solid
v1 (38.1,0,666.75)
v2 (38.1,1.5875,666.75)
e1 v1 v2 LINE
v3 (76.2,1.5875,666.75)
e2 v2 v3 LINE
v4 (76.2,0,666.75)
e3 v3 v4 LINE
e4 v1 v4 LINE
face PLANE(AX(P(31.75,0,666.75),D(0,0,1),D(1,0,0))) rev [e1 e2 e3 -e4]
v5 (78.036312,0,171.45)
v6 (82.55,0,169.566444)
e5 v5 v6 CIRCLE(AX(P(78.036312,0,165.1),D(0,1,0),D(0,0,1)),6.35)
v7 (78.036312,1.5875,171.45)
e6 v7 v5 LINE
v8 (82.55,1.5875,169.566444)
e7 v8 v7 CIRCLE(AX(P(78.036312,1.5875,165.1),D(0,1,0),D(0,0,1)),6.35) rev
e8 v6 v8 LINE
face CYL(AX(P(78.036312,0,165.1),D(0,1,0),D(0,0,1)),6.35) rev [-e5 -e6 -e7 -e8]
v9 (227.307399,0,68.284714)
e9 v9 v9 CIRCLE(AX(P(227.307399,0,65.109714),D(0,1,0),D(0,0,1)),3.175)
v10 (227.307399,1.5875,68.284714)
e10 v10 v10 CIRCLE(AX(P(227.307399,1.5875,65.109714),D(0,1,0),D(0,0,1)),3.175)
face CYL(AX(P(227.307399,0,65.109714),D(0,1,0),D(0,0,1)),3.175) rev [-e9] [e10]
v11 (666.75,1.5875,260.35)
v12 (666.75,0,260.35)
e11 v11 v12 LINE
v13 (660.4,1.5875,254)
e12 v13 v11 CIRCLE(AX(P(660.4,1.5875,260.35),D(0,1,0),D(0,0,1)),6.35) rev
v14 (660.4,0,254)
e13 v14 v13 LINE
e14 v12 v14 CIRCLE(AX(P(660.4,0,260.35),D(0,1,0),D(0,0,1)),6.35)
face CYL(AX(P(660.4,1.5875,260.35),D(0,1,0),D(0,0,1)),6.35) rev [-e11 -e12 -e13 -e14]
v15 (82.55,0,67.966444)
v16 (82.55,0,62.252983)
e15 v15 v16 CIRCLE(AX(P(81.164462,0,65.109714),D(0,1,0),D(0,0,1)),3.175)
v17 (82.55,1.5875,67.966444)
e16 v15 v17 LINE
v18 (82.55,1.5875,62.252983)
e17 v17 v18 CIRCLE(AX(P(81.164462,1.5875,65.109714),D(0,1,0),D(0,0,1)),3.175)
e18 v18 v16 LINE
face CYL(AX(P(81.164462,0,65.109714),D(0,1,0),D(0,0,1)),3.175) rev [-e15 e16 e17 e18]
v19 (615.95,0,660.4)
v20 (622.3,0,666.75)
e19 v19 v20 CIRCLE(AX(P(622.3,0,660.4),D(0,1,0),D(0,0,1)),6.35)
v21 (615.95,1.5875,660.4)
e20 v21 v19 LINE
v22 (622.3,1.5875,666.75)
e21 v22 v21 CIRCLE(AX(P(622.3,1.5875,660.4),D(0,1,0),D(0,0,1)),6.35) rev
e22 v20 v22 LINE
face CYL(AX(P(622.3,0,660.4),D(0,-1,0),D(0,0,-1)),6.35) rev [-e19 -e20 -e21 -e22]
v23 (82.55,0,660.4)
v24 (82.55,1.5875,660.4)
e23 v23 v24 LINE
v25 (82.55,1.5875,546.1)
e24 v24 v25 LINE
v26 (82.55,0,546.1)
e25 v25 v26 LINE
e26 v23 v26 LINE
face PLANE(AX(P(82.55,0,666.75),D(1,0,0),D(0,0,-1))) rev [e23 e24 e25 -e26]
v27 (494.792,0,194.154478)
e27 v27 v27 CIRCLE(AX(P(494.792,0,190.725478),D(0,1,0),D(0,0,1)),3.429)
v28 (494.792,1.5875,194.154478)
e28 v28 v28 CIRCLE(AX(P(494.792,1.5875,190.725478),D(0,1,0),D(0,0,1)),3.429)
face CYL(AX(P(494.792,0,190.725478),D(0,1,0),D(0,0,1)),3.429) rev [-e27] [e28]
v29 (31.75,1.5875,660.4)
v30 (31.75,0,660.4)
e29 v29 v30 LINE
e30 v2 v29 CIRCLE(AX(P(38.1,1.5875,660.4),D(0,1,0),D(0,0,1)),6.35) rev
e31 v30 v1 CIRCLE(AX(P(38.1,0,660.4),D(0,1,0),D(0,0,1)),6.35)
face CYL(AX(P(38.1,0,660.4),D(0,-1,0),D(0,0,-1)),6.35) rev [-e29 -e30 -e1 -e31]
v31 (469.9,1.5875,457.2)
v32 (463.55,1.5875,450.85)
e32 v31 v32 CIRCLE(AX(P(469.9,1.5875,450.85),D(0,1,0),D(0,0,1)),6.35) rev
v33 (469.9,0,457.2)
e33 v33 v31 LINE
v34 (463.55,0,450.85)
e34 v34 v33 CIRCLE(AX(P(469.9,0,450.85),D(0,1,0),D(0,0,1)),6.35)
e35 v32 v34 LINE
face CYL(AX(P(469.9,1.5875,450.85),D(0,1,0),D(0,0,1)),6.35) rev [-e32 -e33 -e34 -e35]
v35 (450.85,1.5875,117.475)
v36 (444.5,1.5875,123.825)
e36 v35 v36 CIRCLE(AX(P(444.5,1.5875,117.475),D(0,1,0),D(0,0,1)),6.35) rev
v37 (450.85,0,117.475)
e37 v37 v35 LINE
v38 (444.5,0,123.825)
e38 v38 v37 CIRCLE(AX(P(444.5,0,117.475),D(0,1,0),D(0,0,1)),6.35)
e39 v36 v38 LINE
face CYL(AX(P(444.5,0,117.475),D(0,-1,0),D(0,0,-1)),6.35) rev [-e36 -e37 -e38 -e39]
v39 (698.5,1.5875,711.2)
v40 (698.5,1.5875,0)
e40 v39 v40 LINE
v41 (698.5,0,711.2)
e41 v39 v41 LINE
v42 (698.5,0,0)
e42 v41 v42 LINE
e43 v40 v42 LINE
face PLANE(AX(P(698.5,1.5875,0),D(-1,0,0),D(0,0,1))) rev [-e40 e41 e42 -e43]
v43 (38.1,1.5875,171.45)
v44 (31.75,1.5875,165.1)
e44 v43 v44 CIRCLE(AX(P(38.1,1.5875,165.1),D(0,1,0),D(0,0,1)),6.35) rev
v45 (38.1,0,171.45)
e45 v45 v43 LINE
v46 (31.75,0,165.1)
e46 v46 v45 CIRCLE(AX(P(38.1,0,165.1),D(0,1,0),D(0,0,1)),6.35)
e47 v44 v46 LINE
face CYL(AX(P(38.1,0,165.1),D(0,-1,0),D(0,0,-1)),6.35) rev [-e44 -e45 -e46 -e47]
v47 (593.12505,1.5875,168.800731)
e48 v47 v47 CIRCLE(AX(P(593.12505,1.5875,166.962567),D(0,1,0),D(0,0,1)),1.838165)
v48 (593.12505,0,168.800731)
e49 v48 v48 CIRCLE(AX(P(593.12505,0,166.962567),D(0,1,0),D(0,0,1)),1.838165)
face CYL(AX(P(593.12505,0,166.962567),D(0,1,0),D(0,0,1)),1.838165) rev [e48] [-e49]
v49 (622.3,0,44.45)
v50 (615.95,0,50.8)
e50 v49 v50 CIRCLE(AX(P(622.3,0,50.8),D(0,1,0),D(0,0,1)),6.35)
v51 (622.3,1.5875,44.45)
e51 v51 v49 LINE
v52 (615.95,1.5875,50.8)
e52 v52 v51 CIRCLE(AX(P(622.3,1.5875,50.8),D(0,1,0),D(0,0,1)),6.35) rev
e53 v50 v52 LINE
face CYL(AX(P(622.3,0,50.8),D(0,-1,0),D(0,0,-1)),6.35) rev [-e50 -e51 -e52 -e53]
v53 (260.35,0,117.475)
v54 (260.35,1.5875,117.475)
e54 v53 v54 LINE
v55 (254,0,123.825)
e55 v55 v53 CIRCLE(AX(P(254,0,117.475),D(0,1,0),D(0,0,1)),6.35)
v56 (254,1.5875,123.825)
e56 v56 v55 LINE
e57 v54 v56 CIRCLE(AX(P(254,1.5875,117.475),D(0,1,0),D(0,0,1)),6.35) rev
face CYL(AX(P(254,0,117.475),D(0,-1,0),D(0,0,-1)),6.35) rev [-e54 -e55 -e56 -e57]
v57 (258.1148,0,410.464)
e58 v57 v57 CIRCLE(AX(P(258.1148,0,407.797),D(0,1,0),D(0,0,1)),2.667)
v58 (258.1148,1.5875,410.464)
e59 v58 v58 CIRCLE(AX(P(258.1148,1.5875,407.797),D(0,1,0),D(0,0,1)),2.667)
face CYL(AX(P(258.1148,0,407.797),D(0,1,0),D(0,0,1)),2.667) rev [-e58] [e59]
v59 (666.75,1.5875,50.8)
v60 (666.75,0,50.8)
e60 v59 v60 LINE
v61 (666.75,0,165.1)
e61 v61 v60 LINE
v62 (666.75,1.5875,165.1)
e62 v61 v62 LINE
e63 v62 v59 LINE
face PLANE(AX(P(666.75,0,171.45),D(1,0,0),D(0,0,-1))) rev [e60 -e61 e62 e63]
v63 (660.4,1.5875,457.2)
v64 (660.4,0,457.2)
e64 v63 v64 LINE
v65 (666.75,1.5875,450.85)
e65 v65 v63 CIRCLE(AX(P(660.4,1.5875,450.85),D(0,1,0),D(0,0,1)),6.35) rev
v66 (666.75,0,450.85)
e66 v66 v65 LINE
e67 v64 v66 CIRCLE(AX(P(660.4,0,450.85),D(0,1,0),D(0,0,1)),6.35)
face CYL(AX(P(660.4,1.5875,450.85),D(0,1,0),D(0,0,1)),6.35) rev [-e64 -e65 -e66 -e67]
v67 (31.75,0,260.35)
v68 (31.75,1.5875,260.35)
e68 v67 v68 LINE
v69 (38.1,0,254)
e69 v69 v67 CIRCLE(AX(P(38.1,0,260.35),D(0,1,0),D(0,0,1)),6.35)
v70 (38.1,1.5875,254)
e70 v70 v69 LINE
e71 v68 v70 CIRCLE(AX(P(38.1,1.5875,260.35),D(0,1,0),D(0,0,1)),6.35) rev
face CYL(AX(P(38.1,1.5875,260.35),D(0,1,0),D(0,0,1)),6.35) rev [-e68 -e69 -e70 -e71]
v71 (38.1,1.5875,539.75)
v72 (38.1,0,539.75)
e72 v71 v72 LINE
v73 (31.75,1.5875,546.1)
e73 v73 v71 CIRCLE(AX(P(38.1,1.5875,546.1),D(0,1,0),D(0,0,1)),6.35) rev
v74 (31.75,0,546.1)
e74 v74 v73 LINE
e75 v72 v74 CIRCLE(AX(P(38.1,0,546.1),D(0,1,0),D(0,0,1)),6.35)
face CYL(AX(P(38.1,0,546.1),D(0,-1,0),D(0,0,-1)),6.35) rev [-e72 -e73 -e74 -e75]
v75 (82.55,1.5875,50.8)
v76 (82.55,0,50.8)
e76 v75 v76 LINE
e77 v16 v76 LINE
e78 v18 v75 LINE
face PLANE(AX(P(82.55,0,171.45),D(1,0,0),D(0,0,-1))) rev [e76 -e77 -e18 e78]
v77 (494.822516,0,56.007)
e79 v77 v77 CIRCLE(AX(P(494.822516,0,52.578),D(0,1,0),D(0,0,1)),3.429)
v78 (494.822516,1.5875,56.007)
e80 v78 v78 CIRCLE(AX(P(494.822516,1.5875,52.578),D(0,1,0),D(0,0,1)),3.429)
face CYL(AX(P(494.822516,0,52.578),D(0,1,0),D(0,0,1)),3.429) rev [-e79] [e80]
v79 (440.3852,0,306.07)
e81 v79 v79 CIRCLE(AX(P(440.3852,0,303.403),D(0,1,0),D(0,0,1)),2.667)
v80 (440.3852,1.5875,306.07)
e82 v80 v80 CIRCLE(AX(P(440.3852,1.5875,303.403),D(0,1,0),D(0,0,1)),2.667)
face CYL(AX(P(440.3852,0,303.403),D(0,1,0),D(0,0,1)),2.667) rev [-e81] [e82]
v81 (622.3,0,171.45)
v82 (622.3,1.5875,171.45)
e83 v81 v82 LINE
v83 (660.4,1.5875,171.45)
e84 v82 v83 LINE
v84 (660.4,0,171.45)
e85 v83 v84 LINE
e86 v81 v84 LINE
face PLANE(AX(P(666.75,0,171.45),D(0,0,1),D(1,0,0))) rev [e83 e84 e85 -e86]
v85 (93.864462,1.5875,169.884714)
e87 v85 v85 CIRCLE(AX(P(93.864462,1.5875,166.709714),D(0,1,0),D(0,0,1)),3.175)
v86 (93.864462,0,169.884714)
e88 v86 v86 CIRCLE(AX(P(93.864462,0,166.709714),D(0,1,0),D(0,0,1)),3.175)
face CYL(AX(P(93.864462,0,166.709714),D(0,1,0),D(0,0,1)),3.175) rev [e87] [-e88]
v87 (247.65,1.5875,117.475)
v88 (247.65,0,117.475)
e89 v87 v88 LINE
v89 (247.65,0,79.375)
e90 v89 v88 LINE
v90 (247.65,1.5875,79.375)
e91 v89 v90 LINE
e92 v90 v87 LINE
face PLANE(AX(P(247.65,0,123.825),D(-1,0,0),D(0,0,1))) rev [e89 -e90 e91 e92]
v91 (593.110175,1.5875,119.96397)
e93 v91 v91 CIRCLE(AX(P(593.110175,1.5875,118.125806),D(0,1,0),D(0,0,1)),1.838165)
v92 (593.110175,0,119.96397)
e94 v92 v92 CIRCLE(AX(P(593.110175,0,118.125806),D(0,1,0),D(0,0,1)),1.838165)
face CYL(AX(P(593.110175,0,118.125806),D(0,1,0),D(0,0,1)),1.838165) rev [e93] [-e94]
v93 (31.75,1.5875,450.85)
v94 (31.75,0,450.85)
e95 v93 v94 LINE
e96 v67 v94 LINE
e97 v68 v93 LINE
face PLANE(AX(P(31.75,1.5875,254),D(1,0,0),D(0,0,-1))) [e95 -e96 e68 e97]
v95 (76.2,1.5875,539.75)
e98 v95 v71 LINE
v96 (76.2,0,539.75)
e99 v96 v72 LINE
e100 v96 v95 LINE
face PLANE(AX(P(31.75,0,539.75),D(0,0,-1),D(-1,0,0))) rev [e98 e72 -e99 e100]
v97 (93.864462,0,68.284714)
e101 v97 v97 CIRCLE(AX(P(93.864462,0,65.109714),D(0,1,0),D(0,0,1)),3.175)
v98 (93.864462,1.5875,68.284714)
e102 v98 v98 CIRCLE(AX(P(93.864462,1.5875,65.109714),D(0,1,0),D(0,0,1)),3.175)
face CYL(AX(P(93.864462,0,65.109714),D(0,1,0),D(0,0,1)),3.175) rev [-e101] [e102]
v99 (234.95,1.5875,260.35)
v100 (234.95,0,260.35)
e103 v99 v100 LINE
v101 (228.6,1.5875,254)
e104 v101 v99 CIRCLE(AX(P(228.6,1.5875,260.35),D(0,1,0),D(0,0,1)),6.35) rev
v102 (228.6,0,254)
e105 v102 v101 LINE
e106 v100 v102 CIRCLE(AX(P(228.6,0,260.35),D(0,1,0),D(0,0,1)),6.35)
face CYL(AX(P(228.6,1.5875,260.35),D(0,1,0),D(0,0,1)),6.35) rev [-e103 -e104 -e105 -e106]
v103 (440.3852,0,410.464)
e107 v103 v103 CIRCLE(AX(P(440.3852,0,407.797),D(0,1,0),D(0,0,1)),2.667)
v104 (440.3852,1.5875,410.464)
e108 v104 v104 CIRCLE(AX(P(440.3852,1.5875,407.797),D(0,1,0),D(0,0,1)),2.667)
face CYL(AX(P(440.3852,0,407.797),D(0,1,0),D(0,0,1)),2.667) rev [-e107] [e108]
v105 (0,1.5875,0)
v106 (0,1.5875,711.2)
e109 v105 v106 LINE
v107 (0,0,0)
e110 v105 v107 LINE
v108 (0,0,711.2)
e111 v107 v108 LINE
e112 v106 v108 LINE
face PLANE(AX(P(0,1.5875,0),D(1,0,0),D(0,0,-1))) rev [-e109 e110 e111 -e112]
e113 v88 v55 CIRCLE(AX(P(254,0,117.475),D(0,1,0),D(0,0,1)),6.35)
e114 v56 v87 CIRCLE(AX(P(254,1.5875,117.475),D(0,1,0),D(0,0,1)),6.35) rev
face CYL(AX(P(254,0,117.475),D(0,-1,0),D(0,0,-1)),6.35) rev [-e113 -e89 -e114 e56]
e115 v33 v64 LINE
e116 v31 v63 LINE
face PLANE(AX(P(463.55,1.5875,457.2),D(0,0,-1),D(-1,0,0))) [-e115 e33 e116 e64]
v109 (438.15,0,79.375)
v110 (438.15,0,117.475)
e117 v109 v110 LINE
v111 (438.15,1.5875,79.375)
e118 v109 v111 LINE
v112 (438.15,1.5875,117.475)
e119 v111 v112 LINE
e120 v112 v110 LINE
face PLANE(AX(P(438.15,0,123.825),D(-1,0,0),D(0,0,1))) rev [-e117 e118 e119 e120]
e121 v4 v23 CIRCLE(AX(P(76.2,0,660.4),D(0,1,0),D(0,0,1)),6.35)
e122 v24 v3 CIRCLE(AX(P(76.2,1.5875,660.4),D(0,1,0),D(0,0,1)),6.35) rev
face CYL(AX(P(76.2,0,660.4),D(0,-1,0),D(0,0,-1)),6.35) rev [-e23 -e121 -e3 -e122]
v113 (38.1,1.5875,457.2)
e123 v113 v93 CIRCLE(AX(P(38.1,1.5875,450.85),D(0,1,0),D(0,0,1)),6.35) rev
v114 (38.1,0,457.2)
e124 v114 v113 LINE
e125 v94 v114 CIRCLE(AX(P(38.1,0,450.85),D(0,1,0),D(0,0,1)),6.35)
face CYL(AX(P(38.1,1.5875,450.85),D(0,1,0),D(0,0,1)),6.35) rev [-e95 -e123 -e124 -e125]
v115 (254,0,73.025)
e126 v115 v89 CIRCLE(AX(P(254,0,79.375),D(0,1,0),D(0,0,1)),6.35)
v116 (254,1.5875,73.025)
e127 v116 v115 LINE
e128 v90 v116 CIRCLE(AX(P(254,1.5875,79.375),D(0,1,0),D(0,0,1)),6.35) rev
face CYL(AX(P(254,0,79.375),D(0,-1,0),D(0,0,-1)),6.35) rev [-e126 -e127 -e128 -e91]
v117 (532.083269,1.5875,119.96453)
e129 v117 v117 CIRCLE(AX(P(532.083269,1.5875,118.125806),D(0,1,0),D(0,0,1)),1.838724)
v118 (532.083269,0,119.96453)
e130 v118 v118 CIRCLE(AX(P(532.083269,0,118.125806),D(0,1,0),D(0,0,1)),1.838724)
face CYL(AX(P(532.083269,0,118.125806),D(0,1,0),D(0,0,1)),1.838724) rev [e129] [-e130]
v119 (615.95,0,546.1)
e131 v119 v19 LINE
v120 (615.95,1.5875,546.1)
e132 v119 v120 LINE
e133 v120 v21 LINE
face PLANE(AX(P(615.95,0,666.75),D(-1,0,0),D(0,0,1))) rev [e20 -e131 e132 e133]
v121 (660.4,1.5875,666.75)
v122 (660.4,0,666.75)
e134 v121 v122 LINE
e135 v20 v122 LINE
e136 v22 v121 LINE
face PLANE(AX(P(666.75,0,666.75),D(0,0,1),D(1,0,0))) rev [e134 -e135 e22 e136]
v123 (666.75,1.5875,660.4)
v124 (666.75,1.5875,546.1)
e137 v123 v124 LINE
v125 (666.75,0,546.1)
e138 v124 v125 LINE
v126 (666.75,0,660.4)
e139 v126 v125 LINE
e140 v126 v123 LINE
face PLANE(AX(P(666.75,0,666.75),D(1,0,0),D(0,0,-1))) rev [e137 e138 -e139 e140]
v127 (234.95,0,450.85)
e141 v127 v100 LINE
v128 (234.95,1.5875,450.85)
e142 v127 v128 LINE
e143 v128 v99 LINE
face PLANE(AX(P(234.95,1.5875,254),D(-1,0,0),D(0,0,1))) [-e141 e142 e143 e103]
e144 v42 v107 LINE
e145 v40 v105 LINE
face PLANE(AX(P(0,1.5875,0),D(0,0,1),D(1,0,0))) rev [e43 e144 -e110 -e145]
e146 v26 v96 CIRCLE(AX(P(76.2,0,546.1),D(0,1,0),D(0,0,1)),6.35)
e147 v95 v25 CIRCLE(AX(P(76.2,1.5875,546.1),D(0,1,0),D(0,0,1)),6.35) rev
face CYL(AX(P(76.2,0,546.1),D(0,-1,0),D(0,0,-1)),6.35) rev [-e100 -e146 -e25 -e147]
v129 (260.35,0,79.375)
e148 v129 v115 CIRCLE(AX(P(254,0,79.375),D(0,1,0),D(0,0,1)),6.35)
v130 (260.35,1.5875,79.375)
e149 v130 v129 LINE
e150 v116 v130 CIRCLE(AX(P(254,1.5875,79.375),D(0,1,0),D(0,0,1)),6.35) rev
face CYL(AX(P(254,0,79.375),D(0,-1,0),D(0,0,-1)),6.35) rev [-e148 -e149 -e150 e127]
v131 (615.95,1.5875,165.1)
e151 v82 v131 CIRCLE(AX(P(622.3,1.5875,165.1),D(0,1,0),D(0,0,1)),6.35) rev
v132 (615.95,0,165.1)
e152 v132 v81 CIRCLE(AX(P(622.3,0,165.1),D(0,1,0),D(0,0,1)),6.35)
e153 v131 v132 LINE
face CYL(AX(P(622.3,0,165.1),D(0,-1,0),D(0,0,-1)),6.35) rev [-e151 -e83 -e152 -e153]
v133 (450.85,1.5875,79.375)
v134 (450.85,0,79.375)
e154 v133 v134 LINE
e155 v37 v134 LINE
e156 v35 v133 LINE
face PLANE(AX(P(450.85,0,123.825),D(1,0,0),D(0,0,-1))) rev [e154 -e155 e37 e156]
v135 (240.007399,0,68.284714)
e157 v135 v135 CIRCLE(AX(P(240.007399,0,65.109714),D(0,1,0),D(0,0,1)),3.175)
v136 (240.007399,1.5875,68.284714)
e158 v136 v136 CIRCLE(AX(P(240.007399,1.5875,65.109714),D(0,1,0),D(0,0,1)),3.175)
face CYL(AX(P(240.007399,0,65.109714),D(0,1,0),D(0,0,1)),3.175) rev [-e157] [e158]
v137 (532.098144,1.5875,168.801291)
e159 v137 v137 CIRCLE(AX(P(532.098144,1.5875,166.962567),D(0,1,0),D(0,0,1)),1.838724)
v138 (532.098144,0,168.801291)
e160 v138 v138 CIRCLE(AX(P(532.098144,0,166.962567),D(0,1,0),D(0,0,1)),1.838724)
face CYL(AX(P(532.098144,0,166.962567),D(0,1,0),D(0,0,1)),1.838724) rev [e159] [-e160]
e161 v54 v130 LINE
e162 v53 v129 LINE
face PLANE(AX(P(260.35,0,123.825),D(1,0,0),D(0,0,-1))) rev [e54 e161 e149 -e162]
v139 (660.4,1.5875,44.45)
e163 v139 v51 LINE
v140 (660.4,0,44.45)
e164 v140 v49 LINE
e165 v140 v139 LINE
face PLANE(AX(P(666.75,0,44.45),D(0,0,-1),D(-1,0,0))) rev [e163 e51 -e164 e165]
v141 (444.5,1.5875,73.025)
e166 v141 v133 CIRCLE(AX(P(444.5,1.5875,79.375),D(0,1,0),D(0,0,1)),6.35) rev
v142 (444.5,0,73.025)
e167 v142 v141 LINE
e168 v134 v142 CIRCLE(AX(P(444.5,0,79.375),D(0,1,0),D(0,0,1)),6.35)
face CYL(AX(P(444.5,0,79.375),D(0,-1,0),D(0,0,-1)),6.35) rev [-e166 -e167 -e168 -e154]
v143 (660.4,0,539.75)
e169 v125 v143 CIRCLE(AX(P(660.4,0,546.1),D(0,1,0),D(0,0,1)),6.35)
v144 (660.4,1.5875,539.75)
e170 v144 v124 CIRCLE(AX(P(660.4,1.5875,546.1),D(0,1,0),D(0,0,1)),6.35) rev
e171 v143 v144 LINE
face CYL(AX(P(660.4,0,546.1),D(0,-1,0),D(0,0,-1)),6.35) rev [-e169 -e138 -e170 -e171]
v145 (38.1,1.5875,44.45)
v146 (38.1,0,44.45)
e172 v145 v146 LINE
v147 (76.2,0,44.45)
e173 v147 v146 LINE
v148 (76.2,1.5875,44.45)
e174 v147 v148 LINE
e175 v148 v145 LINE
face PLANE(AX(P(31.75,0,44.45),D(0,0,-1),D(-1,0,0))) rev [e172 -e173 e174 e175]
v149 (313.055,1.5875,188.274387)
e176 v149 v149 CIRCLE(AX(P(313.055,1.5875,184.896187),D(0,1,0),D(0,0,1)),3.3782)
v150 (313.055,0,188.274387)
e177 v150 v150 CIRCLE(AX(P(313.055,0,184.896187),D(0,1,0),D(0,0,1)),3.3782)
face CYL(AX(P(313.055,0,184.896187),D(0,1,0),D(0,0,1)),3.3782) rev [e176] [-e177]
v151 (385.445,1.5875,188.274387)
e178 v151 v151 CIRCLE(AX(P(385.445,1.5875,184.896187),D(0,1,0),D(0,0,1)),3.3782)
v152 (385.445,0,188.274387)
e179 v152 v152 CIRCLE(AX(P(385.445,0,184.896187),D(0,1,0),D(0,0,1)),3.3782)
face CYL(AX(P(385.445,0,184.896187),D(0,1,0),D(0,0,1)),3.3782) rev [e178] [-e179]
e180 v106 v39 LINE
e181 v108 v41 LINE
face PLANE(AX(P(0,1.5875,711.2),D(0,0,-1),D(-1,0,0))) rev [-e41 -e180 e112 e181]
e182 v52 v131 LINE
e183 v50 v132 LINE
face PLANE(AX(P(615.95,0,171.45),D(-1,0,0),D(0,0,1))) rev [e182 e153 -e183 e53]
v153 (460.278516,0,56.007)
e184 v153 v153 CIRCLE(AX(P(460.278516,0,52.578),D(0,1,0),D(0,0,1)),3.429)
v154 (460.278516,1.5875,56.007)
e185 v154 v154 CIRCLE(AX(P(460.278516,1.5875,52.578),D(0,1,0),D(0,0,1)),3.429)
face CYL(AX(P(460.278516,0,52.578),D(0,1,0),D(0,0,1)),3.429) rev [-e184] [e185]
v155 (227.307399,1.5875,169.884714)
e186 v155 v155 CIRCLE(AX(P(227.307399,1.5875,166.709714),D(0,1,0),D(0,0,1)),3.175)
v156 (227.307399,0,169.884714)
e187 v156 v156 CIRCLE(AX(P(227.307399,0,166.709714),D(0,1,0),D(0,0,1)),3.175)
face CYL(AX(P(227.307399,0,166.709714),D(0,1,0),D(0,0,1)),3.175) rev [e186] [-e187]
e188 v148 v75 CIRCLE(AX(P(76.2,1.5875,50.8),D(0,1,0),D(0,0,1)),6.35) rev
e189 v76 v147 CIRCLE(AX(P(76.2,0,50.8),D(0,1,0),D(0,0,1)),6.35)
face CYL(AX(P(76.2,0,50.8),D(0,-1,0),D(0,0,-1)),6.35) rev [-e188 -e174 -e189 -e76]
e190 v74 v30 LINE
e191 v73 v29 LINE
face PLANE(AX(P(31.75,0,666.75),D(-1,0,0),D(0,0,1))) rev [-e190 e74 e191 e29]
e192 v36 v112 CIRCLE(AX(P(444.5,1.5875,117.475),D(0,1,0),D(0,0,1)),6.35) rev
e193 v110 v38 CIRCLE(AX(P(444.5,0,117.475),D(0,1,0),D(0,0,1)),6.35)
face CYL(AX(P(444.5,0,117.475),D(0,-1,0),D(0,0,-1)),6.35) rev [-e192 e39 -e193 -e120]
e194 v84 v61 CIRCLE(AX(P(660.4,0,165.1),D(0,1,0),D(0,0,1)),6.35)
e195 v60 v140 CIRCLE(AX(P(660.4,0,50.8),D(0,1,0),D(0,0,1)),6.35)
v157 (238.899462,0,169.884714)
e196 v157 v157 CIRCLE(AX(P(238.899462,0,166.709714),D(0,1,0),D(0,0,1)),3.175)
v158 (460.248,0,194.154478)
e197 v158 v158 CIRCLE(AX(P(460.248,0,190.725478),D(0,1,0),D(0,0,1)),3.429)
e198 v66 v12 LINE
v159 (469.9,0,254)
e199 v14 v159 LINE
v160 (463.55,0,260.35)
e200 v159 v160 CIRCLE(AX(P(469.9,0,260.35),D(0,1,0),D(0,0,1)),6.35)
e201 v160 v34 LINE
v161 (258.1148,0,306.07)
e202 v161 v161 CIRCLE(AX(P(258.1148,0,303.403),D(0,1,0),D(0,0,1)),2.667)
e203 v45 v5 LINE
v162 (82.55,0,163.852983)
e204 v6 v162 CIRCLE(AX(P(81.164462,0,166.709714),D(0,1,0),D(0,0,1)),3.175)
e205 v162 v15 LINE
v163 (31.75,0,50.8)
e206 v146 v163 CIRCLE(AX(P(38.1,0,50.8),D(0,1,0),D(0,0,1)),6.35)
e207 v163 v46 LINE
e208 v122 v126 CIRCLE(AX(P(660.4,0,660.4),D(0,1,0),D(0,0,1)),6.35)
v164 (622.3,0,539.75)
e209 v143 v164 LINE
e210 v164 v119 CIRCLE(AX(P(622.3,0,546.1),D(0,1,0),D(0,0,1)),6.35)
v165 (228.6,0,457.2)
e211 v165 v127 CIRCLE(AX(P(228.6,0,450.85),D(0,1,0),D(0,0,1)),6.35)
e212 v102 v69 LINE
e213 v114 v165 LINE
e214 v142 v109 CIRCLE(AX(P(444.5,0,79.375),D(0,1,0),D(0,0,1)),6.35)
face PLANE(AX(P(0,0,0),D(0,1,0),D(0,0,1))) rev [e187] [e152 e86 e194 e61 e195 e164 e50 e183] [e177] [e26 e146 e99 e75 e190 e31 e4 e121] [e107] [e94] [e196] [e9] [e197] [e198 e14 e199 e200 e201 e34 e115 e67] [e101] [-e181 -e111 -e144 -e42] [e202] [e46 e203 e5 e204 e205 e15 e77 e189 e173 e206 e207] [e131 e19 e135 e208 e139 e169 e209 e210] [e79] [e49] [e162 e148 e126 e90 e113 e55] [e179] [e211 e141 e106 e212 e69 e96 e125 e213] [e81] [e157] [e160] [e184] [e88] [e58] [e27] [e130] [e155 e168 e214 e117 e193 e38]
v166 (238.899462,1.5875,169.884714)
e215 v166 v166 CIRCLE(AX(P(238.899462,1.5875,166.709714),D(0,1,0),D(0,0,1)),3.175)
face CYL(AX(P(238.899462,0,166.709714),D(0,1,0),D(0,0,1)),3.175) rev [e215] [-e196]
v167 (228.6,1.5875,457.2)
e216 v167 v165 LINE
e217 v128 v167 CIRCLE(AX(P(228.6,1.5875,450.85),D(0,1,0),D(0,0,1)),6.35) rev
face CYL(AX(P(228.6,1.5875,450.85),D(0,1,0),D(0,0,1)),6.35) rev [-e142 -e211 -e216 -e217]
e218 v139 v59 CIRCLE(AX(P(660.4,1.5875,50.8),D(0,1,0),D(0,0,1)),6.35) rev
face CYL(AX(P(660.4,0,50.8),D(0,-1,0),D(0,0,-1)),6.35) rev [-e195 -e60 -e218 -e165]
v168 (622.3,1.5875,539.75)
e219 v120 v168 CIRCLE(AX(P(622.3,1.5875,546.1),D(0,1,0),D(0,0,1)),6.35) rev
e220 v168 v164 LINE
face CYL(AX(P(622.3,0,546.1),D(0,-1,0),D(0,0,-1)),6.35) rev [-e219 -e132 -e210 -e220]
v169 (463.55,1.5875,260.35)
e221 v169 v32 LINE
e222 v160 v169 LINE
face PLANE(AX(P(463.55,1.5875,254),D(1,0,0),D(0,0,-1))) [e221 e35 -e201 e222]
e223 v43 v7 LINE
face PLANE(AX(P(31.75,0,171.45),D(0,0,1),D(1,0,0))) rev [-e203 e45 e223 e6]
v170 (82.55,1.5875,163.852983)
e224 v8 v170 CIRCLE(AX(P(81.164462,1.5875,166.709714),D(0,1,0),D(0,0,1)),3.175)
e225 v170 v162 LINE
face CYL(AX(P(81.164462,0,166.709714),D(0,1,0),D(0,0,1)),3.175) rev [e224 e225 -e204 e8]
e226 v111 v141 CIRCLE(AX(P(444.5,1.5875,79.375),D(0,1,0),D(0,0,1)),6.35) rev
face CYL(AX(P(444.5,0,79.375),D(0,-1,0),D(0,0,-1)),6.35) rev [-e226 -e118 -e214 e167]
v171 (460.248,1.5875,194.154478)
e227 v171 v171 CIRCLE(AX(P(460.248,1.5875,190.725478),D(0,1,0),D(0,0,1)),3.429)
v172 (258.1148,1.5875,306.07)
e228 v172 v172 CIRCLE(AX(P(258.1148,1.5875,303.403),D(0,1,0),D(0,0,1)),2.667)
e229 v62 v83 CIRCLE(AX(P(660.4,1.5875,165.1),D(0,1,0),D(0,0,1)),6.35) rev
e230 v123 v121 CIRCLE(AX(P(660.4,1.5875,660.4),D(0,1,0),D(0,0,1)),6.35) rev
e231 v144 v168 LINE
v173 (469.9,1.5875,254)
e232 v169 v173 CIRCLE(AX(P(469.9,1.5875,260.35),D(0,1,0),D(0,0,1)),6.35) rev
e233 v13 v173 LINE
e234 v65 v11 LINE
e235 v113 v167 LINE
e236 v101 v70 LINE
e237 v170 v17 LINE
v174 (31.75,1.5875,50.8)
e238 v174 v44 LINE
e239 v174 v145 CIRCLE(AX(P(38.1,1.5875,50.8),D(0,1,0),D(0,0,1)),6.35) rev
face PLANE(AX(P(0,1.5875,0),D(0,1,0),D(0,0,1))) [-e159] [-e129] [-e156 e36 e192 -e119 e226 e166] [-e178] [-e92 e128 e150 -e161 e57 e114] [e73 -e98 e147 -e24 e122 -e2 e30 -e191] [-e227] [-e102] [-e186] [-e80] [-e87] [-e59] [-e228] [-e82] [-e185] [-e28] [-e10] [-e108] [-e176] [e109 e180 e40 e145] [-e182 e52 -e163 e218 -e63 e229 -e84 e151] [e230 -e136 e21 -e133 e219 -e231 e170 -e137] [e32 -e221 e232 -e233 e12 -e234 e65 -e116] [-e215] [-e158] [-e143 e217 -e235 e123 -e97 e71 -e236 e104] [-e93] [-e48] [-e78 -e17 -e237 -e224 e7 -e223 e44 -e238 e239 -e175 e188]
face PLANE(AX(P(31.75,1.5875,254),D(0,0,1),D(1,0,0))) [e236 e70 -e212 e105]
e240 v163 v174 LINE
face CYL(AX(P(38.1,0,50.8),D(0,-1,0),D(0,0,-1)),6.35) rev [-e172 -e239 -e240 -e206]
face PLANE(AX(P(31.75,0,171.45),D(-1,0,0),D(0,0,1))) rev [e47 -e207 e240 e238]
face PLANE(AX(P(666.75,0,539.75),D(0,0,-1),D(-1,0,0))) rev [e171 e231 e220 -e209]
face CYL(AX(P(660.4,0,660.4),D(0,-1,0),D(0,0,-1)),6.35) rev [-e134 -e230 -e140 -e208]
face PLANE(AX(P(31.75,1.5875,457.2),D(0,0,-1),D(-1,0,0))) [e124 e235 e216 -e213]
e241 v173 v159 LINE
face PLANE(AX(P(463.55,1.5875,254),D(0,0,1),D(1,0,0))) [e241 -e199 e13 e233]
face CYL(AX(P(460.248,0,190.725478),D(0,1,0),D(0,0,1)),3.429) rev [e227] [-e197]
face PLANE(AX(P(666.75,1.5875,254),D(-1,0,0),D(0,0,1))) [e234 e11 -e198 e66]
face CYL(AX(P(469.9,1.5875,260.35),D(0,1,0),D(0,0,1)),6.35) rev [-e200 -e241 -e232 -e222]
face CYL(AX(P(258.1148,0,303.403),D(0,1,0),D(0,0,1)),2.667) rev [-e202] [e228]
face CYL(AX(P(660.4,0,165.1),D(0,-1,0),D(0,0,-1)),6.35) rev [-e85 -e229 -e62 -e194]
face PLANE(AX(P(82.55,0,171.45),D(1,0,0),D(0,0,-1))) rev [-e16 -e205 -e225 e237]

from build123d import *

# Parameters (mm, degrees)
SKETCH1_W           = 698.5
SKETCH1_H           = 711.2
SKETCH1_W_2         = 203.2
SKETCH1_H_2         = 203.2
BOSS_EXTRUDE1_DEPTH = 1.5875
FILLET1_R           = 6.35
SKETCH2_R           = 2.667
SKETCH2_R_2         = 3.429
SKETCH2_R_3         = 3.175
SKETCH2_R_4         = 3.3782
SKETCH2_R_5         = 1.838164507
SKETCH2_R_6         = 1.838724473
CUT_EXTRUDE1_DEPTH  = 997.850144283
SKETCH3_W           = 50.8
SKETCH3_H           = 127
CUT_EXTRUDE2_DEPTH  = 997.850144283
SKETCH4_W           = 12.7
SKETCH4_H           = 50.8
CUT_EXTRUDE3_DEPTH  = 997.850144283
FILLET2_R           = 6.35


with BuildPart() as part:
    # Sketch1 → Boss-Extrude1 (new body)
    with BuildSketch(Plane(origin=(0, 0, 0), x_dir=(1, 0, 0), z_dir=(0, 1, 0))):
        with Locations((349.25, -355.6)):
            Rectangle(SKETCH1_W, SKETCH1_H)
        with Locations((133.35, -355.6)):
            Rectangle(SKETCH1_W_2, SKETCH1_H_2, mode=Mode.SUBTRACT)
        with Locations((565.15, -355.6)):
            Rectangle(SKETCH1_W_2, SKETCH1_H_2, mode=Mode.SUBTRACT)
    extrude(amount=BOSS_EXTRUDE1_DEPTH)

    # Fillet1
    fillet1_edges = [part.edges().sort_by_distance(p)[0] for p in [
        (31.75, 0.79375, 254),
        (31.75, 0.79375, 457.2),
        (234.95, 0.79375, 457.2),
        (234.95, 0.79375, 254),
        (463.55, 0.79375, 254),
        (463.55, 0.79375, 457.2),
        (666.75, 0.79375, 457.2),
        (666.75, 0.79375, 254),
    ]]
    fillet(fillet1_edges, radius=FILLET1_R)

    # Sketch2 → Cut-Extrude1 (cut, through all)
    with BuildSketch(Plane(origin=(0, 1.5875, 0), x_dir=(1, 0, 0), z_dir=(0, 1, 0))):
        with Locations(Location((440.3852, -407.797, 0), (0, 0, 270))):
            Circle(SKETCH2_R)
        with Locations(Location((258.1148, -407.797, 0), (0, 0, 270))):
            Circle(SKETCH2_R)
        with Locations(Location((258.1148, -303.403, 0), (0, 0, 270))):
            Circle(SKETCH2_R)
        with Locations(Location((440.3852, -303.403, 0), (0, 0, 270))):
            Circle(SKETCH2_R)
        with Locations(Location((460.248, -190.725477854, 0), (0, 0, 270))):
            Circle(SKETCH2_R_2)
        with Locations(Location((494.792, -190.725477854, 0), (0, 0, 270))):
            Circle(SKETCH2_R_2)
        with Locations(Location((460.278515752, -52.578, 0), (0, 0, 270))):
            Circle(SKETCH2_R_2)
        with Locations(Location((494.822515752, -52.578, 0), (0, 0, 270))):
            Circle(SKETCH2_R_2)
        with Locations(Location((227.307398857, -65.109713759, 0), (0, 0, 270))):
            Circle(SKETCH2_R_3)
        with Locations(Location((227.307398857, -166.709713759, 0), (0, 0, 270))):
            Circle(SKETCH2_R_3)
        with Locations(Location((93.864461583, -166.709713759, 0), (0, 0, 270))):
            Circle(SKETCH2_R_3)
        with Locations(Location((93.864461583, -65.109713759, 0), (0, 0, 270))):
            Circle(SKETCH2_R_3)
        with Locations(Location((81.164461583, -65.109713759, 0), (0, 0, 270))):
            Circle(SKETCH2_R_3)
        with Locations(Location((81.164461583, -166.709713759, 0), (0, 0, 270))):
            Circle(SKETCH2_R_3)
        with Locations(Location((238.899461934, -166.709713759, 0), (0, 0, 270))):
            Circle(SKETCH2_R_3)
        with Locations(Location((240.007398857, -65.109713759, 0), (0, 0, 270))):
            Circle(SKETCH2_R_3)
        with Locations(Location((385.445, -184.896187086, 0), (0, 0, 270))):
            Circle(SKETCH2_R_4)
        with Locations(Location((313.055, -184.896187086, 0), (0, 0, 270))):
            Circle(SKETCH2_R_4)
        with Locations(Location((593.125050357, -166.962566622, 0), (0, 0, 270))):
            Circle(SKETCH2_R_5)
        with Locations(Location((532.098143635, -166.962566622, 0), (0, 0, 270))):
            Circle(SKETCH2_R_6)
        with Locations(Location((532.083268617, -118.12580583, 0), (0, 0, 270))):
            Circle(SKETCH2_R_6)
        with Locations(Location((593.11017534, -118.12580583, 0), (0, 0, 270))):
            Circle(SKETCH2_R_5)
    extrude(amount=-CUT_EXTRUDE1_DEPTH, mode=Mode.SUBTRACT)

    # Sketch3 → Cut-Extrude2 (cut, through all)
    with BuildSketch(Plane(origin=(0, 1.5875, 0), x_dir=(1, 0, 0), z_dir=(0, 1, 0))):
        with Locations((641.35, -107.95)):
            Rectangle(SKETCH3_W, SKETCH3_H)
        with Locations((57.15, -107.95)):
            Rectangle(SKETCH3_W, SKETCH3_H)
        with Locations((57.15, -603.25)):
            Rectangle(SKETCH3_W, SKETCH3_H)
        with Locations((641.35, -603.25)):
            Rectangle(SKETCH3_W, SKETCH3_H)
    extrude(amount=-CUT_EXTRUDE2_DEPTH, mode=Mode.SUBTRACT)

    # Sketch4 → Cut-Extrude3 (cut, through all)
    with BuildSketch(Plane(origin=(0, 1.5875, 0), x_dir=(1, 0, 0), z_dir=(0, 1, 0))):
        with Locations((444.5, -98.425)):
            Rectangle(SKETCH4_W, SKETCH4_H)
        with Locations((254, -98.425)):
            Rectangle(SKETCH4_W, SKETCH4_H)
    extrude(amount=-CUT_EXTRUDE3_DEPTH, mode=Mode.SUBTRACT)

    # Fillet2
    # the kernel refuses this fillet: 6.35 mm, written as the material it adds along each edge
    with BuildSketch(Plane(origin=(438.15, 1.5875, 73.025), x_dir=(0, 0, 1), z_dir=(0, -1, 0)), Plane(origin=(450.85, 1.5875, 73.025), x_dir=(-1, 0, 0), z_dir=(0, -1, 0)), Plane(origin=(260.35, 1.5875, 73.025), x_dir=(-1, 0, 0), z_dir=(0, -1, 0)), Plane(origin=(247.65, 1.5875, 73.025), x_dir=(0, 0, 1), z_dir=(0, -1, 0)), Plane(origin=(260.35, 1.5875, 123.825), x_dir=(0, 0, -1), z_dir=(0, -1, 0)), Plane(origin=(450.85, 1.5875, 123.825), x_dir=(0, 0, -1), z_dir=(0, -1, 0)), Plane(origin=(82.55, 1.5875, 44.45), x_dir=(-1, 0, 0), z_dir=(0, -1, 0)), Plane(origin=(31.75, 1.5875, 44.45), x_dir=(0, 0, 1), z_dir=(0, -1, 0)), Plane(origin=(31.75, 1.5875, 171.45), x_dir=(1, 0, 0), z_dir=(0, -1, 0)), Plane(origin=(615.95, 1.5875, 44.45), x_dir=(0, 0, 1), z_dir=(0, -1, 0)), Plane(origin=(666.75, 1.5875, 44.45), x_dir=(-1, 0, 0), z_dir=(0, -1, 0)), Plane(origin=(31.75, 1.5875, 539.75), x_dir=(0, 0, 1), z_dir=(0, -1, 0)), Plane(origin=(31.75, 1.5875, 666.75), x_dir=(1, 0, 0), z_dir=(0, -1, 0)), Plane(origin=(615.95, 1.5875, 539.75), x_dir=(0, 0, 1), z_dir=(0, -1, 0)), Plane(origin=(666.75, 1.5875, 539.75), x_dir=(-1, 0, 0), z_dir=(0, -1, 0))) as fillet2_piece_1:
        with BuildLine():
            CenterArc((FILLET2_R, -FILLET2_R), FILLET2_R, 90, 90)
            Line((0, -FILLET2_R), (-FILLET2_R * 0.02, -FILLET2_R))
            Line((-FILLET2_R * 0.02, -FILLET2_R), (-FILLET2_R * 0.02, FILLET2_R * 0.02))
            Line((-FILLET2_R * 0.02, FILLET2_R * 0.02), (FILLET2_R, FILLET2_R * 0.02))
            Line((FILLET2_R, FILLET2_R * 0.02), (FILLET2_R, 0))
        make_face()
    extrude(amount=1.5875)
    with BuildSketch(Plane(origin=(247.65, 1.5875, 123.825), x_dir=(0, 0, -1), z_dir=(0, -1, 0)), Plane(origin=(438.15, 1.5875, 123.825), x_dir=(0, 0, -1), z_dir=(0, -1, 0)), Plane(origin=(615.95, 1.5875, 171.45), x_dir=(0, 0, -1), z_dir=(0, -1, 0)), Plane(origin=(666.75, 1.5875, 171.45), x_dir=(-1, 0, 0), z_dir=(0, -1, 0)), Plane(origin=(82.55, 1.5875, 539.75), x_dir=(0, 0, 1), z_dir=(0, -1, 0)), Plane(origin=(82.55, 1.5875, 666.75), x_dir=(-1, 0, 0), z_dir=(0, -1, 0)), Plane(origin=(615.95, 1.5875, 666.75), x_dir=(0, 0, -1), z_dir=(0, -1, 0)), Plane(origin=(666.75, 1.5875, 666.75), x_dir=(-1, 0, 0), z_dir=(0, -1, 0))) as fillet2_piece_2:
        with BuildLine():
            CenterArc((FILLET2_R, FILLET2_R), FILLET2_R, 180, 90)
            Line((0, FILLET2_R), (-FILLET2_R * 0.02, FILLET2_R))
            Line((-FILLET2_R * 0.02, FILLET2_R), (-FILLET2_R * 0.02, -FILLET2_R * 0.02))
            Line((-FILLET2_R * 0.02, -FILLET2_R * 0.02), (FILLET2_R, -FILLET2_R * 0.02))
            Line((FILLET2_R, -FILLET2_R * 0.02), (FILLET2_R, 0))
        make_face()
    extrude(amount=1.5875)
    with BuildSketch(Plane(origin=(82.55, 1.5875, 171.45), x_dir=(0, 0, -1), z_dir=(0, -1, 0))) as fillet2_piece_3:
        with BuildLine():
            CenterArc((6.35, -4.51368774), FILLET2_R, 134.698575063, 45.301424937)
            Line((0, -4.51368774), (-0.127, -4.51368774))
            Line((-0.127, -4.51368774), (-0.127, 0))
            Line((-0.127, 0), (0, 0.127))
            ThreePointArc((0, 0.127), (0.941777945, 0.127), (1.794227008, 0.090273755))
            Line((1.794227008, 0.090273755), (1.88355589, 0))
        make_face()
    extrude(amount=1.5875)


solid = part.part
